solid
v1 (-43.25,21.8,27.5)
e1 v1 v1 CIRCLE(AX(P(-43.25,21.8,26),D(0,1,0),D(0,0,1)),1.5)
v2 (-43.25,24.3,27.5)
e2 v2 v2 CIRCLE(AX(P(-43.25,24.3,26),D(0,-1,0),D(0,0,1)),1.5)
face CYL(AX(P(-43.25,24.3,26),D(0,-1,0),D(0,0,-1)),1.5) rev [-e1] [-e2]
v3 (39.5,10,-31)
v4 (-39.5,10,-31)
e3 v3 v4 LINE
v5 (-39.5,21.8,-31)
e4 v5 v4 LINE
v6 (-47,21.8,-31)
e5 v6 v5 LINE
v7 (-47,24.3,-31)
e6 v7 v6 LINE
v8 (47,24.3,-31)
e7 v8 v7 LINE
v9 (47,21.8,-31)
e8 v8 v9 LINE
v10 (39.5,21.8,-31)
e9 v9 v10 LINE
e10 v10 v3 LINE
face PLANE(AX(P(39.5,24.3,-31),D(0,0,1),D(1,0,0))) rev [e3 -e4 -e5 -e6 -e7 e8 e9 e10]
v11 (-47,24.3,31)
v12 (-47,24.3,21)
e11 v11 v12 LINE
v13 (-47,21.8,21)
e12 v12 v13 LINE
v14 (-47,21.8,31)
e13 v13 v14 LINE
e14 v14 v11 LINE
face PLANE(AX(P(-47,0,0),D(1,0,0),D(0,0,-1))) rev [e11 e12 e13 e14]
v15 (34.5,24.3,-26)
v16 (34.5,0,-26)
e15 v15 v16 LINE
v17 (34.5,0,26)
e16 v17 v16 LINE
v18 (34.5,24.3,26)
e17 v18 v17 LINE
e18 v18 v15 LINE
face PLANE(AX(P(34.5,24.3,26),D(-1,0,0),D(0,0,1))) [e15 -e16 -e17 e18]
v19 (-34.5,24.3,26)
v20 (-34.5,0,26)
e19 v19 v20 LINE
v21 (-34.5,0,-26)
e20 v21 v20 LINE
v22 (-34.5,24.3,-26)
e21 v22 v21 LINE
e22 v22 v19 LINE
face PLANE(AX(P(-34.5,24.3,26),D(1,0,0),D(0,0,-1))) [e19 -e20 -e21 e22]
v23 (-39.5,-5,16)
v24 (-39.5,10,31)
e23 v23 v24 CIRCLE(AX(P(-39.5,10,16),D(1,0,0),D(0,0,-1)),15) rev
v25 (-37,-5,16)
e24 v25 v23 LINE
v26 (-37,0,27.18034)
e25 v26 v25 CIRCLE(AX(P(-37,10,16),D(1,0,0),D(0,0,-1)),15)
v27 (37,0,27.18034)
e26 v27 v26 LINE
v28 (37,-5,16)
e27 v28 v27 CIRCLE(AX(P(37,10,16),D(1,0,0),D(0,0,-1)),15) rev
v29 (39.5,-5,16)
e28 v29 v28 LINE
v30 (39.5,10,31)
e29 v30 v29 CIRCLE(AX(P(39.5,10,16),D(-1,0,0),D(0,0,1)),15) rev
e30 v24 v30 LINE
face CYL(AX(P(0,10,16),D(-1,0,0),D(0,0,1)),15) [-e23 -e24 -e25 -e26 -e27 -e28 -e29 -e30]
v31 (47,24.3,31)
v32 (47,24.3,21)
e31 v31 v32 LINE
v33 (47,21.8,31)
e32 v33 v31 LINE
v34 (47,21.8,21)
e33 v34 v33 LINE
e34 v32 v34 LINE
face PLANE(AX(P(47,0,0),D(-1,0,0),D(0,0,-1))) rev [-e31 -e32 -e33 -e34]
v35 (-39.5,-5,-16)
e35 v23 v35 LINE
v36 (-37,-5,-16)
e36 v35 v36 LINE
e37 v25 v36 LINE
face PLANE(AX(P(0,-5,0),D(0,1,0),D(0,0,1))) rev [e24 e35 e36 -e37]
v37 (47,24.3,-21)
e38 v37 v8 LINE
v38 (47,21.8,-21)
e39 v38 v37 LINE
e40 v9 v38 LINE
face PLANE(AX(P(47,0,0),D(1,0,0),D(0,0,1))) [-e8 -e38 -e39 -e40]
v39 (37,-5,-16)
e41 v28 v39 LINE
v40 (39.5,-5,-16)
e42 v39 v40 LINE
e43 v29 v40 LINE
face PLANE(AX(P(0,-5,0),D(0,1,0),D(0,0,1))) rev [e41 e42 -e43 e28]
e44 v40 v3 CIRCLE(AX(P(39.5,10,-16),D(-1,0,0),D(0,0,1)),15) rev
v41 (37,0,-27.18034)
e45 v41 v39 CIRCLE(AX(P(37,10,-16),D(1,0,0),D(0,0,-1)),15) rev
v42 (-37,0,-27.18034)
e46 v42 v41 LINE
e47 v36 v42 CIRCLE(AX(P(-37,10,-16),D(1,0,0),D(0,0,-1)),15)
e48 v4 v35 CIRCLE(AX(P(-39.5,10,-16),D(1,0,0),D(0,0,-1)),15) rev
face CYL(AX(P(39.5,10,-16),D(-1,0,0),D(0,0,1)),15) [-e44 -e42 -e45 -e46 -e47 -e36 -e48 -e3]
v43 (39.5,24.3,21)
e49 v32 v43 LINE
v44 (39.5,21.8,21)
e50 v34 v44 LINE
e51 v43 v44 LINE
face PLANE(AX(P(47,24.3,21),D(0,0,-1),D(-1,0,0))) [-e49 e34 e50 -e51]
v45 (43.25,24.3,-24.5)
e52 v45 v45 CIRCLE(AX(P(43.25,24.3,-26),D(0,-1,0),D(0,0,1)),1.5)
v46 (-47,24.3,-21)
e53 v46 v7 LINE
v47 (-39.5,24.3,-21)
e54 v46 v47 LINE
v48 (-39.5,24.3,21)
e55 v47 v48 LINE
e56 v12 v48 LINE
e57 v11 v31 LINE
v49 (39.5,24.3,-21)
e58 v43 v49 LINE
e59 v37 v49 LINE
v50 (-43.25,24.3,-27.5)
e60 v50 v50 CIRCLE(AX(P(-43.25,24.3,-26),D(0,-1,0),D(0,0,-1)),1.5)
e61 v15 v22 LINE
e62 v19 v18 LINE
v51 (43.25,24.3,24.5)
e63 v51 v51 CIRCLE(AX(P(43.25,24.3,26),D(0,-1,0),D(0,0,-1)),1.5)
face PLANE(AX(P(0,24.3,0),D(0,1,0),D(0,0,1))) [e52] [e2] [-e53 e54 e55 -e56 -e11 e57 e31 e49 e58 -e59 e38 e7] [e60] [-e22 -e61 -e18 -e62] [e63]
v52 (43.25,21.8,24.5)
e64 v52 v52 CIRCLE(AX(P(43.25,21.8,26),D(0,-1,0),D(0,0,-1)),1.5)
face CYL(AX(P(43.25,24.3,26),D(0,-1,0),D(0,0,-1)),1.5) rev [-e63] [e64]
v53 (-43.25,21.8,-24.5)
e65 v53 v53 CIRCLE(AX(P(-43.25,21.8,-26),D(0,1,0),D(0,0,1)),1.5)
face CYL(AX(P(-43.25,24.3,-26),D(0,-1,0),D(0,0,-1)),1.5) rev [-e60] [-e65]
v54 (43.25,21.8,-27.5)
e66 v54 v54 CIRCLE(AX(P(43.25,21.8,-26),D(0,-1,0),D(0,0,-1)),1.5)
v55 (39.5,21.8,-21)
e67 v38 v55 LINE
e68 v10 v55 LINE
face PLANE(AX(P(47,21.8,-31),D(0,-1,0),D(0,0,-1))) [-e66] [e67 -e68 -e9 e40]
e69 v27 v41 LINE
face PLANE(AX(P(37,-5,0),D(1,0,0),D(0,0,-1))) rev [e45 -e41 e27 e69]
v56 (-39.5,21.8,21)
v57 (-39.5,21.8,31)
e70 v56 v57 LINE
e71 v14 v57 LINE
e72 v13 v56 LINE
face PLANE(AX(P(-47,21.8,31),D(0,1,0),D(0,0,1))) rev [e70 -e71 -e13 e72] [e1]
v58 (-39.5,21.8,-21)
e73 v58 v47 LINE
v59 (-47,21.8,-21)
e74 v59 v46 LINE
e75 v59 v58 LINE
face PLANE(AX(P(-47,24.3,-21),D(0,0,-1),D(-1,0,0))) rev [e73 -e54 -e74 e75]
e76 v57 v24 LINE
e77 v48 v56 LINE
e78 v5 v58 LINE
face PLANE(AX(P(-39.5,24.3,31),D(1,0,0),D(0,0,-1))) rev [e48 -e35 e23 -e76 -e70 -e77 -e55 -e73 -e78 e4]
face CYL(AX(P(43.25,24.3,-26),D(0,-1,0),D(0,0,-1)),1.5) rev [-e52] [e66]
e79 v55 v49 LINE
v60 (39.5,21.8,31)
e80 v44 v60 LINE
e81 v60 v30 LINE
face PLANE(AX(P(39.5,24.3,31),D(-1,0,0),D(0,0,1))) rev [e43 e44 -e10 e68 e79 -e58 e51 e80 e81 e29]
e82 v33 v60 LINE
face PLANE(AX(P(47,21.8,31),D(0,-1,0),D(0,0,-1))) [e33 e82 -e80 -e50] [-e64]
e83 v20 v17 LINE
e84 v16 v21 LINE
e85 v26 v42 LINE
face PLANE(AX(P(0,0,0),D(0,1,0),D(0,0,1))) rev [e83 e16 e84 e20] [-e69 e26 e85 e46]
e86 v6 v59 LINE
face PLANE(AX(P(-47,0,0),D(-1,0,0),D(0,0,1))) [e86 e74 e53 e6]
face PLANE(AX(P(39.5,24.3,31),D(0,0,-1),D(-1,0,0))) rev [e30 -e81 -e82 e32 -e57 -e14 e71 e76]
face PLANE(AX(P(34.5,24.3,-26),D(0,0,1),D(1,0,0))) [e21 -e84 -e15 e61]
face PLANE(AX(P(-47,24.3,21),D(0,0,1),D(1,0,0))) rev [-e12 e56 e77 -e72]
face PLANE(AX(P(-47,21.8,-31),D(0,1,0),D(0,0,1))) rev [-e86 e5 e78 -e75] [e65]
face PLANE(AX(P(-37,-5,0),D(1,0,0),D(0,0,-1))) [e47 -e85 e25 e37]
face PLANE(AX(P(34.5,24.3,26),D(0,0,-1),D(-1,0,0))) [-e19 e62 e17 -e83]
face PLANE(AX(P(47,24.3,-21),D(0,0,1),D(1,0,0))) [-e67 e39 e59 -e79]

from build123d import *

# Parameters (mm, degrees)
SKETCH1_W                 = 79
SKETCH1_H                 = 62
SKETCH1_W_2               = 69
SKETCH1_H_2               = 52
BOSS_EXTRUDE1_DEPTH       = 24.3
BOSS_EXTRUDE2_START       = -5
BOSS_EXTRUDE2_OUTLINE_W   = 79
BOSS_EXTRUDE2_OUTLINE_H   = 62
BOSS_EXTRUDE2_OUTLINE_W_2 = 74
BOSS_EXTRUDE2_OUTLINE_H_2 = 57
BOSS_EXTRUDE2_DEPTH       = 5
SKETCH3_W                 = 10
SKETCH3_H                 = 2.5
BOSS_EXTRUDE3_DEPTH       = 7.5
CUT_EXTRUDE1_DEPTH        = 63.355753544
CUT_EXTRUDE1_DEPTH_BACK   = 63.355753544
SKETCH4_R                 = 1.5
FILLET1_R                 = 15


# Read off the part's stored shape, not the designer's step: Boss-Extrude2
with BuildPart() as part:
    # Sketch1 → Boss-Extrude1 (new body)
    with BuildSketch(Plane(origin=(0, 0, 0), x_dir=(1, 0, 0), z_dir=(0, 1, 0))):
        Rectangle(SKETCH1_W, SKETCH1_H)
        Rectangle(SKETCH1_W_2, SKETCH1_H_2, mode=Mode.SUBTRACT)
    extrude(amount=BOSS_EXTRUDE1_DEPTH)

    # Boss-Extrude2 outline → Boss-Extrude2 (add)
    with BuildSketch(Plane(origin=(0, 0, 0), x_dir=(1, 0, 0), z_dir=(0, 1, 0)).offset(BOSS_EXTRUDE2_START)):
        Rectangle(BOSS_EXTRUDE2_OUTLINE_W, BOSS_EXTRUDE2_OUTLINE_H)
        Rectangle(BOSS_EXTRUDE2_OUTLINE_W_2, BOSS_EXTRUDE2_OUTLINE_H_2, mode=Mode.SUBTRACT)
    extrude(amount=BOSS_EXTRUDE2_DEPTH)

    # Sketch3 → Boss-Extrude3 (add)
    with BuildSketch(Plane.ZY.offset(39.5)):
        with Locations((-26, 23.05)):
            Rectangle(SKETCH3_W, SKETCH3_H)
        with Locations((26, 23.05)):
            Rectangle(SKETCH3_W, SKETCH3_H)
    boss_extrude3 = extrude(amount=BOSS_EXTRUDE3_DEPTH)

    # Mirror1: Boss-Extrude3 across plane
    add(boss_extrude3.mirror(Plane.ZY))

    # Sketch4 → Cut-Extrude1 (cut, two sides: drawn at the far end of the back side and taken through both)
    with BuildSketch(Plane.XZ.offset(-21.8).offset(-CUT_EXTRUDE1_DEPTH_BACK)):
        with Locations(Location((43.25, 26, 0), (0, 0, 270))):
            Circle(SKETCH4_R)
        with Locations(Location((-43.25, 26, 0), (0, 0, 90))):
            Circle(SKETCH4_R)
        with Locations(Location((-43.25, -26, 0), (0, 0, 270))):
            Circle(SKETCH4_R)
        with Locations(Location((43.25, -26, 0), (0, 0, 270))):
            Circle(SKETCH4_R)
    extrude(amount=CUT_EXTRUDE1_DEPTH + CUT_EXTRUDE1_DEPTH_BACK, mode=Mode.SUBTRACT)

    # Fillet1
    # the kernel refuses this fillet: 15 mm, written as the material it takes off along each edge
    with BuildSketch(Plane(origin=(-77, -5, 31), x_dir=(0, 1, 0), z_dir=(1, 0, 0))) as fillet1_piece_1:
        with BuildLine():
            CenterArc((FILLET1_R, -FILLET1_R), FILLET1_R, 90, 90)
            Line((0, -FILLET1_R), (-FILLET1_R * 0.02, -FILLET1_R))
            Line((-FILLET1_R * 0.02, -FILLET1_R), (-FILLET1_R * 0.02, FILLET1_R * 0.02))
            Line((-FILLET1_R * 0.02, FILLET1_R * 0.02), (FILLET1_R, FILLET1_R * 0.02))
            Line((FILLET1_R, FILLET1_R * 0.02), (FILLET1_R, 0))
        make_face()
    extrude(amount=154, mode=Mode.SUBTRACT)
    # the kernel refuses this fillet: 15 mm, written as the material it takes off along each edge
    with BuildSketch(Plane(origin=(77, -5, -31), x_dir=(0, 1, 0), z_dir=(-1, 0, 0))) as fillet1_2_piece_1:
        with BuildLine():
            CenterArc((FILLET1_R, -FILLET1_R), FILLET1_R, 90, 90)
            Line((0, -FILLET1_R), (-FILLET1_R * 0.02, -FILLET1_R))
            Line((-FILLET1_R * 0.02, -FILLET1_R), (-FILLET1_R * 0.02, FILLET1_R * 0.02))
            Line((-FILLET1_R * 0.02, FILLET1_R * 0.02), (FILLET1_R, FILLET1_R * 0.02))
            Line((FILLET1_R, FILLET1_R * 0.02), (FILLET1_R, 0))
        make_face()
    extrude(amount=154, mode=Mode.SUBTRACT)


solid = part.part
